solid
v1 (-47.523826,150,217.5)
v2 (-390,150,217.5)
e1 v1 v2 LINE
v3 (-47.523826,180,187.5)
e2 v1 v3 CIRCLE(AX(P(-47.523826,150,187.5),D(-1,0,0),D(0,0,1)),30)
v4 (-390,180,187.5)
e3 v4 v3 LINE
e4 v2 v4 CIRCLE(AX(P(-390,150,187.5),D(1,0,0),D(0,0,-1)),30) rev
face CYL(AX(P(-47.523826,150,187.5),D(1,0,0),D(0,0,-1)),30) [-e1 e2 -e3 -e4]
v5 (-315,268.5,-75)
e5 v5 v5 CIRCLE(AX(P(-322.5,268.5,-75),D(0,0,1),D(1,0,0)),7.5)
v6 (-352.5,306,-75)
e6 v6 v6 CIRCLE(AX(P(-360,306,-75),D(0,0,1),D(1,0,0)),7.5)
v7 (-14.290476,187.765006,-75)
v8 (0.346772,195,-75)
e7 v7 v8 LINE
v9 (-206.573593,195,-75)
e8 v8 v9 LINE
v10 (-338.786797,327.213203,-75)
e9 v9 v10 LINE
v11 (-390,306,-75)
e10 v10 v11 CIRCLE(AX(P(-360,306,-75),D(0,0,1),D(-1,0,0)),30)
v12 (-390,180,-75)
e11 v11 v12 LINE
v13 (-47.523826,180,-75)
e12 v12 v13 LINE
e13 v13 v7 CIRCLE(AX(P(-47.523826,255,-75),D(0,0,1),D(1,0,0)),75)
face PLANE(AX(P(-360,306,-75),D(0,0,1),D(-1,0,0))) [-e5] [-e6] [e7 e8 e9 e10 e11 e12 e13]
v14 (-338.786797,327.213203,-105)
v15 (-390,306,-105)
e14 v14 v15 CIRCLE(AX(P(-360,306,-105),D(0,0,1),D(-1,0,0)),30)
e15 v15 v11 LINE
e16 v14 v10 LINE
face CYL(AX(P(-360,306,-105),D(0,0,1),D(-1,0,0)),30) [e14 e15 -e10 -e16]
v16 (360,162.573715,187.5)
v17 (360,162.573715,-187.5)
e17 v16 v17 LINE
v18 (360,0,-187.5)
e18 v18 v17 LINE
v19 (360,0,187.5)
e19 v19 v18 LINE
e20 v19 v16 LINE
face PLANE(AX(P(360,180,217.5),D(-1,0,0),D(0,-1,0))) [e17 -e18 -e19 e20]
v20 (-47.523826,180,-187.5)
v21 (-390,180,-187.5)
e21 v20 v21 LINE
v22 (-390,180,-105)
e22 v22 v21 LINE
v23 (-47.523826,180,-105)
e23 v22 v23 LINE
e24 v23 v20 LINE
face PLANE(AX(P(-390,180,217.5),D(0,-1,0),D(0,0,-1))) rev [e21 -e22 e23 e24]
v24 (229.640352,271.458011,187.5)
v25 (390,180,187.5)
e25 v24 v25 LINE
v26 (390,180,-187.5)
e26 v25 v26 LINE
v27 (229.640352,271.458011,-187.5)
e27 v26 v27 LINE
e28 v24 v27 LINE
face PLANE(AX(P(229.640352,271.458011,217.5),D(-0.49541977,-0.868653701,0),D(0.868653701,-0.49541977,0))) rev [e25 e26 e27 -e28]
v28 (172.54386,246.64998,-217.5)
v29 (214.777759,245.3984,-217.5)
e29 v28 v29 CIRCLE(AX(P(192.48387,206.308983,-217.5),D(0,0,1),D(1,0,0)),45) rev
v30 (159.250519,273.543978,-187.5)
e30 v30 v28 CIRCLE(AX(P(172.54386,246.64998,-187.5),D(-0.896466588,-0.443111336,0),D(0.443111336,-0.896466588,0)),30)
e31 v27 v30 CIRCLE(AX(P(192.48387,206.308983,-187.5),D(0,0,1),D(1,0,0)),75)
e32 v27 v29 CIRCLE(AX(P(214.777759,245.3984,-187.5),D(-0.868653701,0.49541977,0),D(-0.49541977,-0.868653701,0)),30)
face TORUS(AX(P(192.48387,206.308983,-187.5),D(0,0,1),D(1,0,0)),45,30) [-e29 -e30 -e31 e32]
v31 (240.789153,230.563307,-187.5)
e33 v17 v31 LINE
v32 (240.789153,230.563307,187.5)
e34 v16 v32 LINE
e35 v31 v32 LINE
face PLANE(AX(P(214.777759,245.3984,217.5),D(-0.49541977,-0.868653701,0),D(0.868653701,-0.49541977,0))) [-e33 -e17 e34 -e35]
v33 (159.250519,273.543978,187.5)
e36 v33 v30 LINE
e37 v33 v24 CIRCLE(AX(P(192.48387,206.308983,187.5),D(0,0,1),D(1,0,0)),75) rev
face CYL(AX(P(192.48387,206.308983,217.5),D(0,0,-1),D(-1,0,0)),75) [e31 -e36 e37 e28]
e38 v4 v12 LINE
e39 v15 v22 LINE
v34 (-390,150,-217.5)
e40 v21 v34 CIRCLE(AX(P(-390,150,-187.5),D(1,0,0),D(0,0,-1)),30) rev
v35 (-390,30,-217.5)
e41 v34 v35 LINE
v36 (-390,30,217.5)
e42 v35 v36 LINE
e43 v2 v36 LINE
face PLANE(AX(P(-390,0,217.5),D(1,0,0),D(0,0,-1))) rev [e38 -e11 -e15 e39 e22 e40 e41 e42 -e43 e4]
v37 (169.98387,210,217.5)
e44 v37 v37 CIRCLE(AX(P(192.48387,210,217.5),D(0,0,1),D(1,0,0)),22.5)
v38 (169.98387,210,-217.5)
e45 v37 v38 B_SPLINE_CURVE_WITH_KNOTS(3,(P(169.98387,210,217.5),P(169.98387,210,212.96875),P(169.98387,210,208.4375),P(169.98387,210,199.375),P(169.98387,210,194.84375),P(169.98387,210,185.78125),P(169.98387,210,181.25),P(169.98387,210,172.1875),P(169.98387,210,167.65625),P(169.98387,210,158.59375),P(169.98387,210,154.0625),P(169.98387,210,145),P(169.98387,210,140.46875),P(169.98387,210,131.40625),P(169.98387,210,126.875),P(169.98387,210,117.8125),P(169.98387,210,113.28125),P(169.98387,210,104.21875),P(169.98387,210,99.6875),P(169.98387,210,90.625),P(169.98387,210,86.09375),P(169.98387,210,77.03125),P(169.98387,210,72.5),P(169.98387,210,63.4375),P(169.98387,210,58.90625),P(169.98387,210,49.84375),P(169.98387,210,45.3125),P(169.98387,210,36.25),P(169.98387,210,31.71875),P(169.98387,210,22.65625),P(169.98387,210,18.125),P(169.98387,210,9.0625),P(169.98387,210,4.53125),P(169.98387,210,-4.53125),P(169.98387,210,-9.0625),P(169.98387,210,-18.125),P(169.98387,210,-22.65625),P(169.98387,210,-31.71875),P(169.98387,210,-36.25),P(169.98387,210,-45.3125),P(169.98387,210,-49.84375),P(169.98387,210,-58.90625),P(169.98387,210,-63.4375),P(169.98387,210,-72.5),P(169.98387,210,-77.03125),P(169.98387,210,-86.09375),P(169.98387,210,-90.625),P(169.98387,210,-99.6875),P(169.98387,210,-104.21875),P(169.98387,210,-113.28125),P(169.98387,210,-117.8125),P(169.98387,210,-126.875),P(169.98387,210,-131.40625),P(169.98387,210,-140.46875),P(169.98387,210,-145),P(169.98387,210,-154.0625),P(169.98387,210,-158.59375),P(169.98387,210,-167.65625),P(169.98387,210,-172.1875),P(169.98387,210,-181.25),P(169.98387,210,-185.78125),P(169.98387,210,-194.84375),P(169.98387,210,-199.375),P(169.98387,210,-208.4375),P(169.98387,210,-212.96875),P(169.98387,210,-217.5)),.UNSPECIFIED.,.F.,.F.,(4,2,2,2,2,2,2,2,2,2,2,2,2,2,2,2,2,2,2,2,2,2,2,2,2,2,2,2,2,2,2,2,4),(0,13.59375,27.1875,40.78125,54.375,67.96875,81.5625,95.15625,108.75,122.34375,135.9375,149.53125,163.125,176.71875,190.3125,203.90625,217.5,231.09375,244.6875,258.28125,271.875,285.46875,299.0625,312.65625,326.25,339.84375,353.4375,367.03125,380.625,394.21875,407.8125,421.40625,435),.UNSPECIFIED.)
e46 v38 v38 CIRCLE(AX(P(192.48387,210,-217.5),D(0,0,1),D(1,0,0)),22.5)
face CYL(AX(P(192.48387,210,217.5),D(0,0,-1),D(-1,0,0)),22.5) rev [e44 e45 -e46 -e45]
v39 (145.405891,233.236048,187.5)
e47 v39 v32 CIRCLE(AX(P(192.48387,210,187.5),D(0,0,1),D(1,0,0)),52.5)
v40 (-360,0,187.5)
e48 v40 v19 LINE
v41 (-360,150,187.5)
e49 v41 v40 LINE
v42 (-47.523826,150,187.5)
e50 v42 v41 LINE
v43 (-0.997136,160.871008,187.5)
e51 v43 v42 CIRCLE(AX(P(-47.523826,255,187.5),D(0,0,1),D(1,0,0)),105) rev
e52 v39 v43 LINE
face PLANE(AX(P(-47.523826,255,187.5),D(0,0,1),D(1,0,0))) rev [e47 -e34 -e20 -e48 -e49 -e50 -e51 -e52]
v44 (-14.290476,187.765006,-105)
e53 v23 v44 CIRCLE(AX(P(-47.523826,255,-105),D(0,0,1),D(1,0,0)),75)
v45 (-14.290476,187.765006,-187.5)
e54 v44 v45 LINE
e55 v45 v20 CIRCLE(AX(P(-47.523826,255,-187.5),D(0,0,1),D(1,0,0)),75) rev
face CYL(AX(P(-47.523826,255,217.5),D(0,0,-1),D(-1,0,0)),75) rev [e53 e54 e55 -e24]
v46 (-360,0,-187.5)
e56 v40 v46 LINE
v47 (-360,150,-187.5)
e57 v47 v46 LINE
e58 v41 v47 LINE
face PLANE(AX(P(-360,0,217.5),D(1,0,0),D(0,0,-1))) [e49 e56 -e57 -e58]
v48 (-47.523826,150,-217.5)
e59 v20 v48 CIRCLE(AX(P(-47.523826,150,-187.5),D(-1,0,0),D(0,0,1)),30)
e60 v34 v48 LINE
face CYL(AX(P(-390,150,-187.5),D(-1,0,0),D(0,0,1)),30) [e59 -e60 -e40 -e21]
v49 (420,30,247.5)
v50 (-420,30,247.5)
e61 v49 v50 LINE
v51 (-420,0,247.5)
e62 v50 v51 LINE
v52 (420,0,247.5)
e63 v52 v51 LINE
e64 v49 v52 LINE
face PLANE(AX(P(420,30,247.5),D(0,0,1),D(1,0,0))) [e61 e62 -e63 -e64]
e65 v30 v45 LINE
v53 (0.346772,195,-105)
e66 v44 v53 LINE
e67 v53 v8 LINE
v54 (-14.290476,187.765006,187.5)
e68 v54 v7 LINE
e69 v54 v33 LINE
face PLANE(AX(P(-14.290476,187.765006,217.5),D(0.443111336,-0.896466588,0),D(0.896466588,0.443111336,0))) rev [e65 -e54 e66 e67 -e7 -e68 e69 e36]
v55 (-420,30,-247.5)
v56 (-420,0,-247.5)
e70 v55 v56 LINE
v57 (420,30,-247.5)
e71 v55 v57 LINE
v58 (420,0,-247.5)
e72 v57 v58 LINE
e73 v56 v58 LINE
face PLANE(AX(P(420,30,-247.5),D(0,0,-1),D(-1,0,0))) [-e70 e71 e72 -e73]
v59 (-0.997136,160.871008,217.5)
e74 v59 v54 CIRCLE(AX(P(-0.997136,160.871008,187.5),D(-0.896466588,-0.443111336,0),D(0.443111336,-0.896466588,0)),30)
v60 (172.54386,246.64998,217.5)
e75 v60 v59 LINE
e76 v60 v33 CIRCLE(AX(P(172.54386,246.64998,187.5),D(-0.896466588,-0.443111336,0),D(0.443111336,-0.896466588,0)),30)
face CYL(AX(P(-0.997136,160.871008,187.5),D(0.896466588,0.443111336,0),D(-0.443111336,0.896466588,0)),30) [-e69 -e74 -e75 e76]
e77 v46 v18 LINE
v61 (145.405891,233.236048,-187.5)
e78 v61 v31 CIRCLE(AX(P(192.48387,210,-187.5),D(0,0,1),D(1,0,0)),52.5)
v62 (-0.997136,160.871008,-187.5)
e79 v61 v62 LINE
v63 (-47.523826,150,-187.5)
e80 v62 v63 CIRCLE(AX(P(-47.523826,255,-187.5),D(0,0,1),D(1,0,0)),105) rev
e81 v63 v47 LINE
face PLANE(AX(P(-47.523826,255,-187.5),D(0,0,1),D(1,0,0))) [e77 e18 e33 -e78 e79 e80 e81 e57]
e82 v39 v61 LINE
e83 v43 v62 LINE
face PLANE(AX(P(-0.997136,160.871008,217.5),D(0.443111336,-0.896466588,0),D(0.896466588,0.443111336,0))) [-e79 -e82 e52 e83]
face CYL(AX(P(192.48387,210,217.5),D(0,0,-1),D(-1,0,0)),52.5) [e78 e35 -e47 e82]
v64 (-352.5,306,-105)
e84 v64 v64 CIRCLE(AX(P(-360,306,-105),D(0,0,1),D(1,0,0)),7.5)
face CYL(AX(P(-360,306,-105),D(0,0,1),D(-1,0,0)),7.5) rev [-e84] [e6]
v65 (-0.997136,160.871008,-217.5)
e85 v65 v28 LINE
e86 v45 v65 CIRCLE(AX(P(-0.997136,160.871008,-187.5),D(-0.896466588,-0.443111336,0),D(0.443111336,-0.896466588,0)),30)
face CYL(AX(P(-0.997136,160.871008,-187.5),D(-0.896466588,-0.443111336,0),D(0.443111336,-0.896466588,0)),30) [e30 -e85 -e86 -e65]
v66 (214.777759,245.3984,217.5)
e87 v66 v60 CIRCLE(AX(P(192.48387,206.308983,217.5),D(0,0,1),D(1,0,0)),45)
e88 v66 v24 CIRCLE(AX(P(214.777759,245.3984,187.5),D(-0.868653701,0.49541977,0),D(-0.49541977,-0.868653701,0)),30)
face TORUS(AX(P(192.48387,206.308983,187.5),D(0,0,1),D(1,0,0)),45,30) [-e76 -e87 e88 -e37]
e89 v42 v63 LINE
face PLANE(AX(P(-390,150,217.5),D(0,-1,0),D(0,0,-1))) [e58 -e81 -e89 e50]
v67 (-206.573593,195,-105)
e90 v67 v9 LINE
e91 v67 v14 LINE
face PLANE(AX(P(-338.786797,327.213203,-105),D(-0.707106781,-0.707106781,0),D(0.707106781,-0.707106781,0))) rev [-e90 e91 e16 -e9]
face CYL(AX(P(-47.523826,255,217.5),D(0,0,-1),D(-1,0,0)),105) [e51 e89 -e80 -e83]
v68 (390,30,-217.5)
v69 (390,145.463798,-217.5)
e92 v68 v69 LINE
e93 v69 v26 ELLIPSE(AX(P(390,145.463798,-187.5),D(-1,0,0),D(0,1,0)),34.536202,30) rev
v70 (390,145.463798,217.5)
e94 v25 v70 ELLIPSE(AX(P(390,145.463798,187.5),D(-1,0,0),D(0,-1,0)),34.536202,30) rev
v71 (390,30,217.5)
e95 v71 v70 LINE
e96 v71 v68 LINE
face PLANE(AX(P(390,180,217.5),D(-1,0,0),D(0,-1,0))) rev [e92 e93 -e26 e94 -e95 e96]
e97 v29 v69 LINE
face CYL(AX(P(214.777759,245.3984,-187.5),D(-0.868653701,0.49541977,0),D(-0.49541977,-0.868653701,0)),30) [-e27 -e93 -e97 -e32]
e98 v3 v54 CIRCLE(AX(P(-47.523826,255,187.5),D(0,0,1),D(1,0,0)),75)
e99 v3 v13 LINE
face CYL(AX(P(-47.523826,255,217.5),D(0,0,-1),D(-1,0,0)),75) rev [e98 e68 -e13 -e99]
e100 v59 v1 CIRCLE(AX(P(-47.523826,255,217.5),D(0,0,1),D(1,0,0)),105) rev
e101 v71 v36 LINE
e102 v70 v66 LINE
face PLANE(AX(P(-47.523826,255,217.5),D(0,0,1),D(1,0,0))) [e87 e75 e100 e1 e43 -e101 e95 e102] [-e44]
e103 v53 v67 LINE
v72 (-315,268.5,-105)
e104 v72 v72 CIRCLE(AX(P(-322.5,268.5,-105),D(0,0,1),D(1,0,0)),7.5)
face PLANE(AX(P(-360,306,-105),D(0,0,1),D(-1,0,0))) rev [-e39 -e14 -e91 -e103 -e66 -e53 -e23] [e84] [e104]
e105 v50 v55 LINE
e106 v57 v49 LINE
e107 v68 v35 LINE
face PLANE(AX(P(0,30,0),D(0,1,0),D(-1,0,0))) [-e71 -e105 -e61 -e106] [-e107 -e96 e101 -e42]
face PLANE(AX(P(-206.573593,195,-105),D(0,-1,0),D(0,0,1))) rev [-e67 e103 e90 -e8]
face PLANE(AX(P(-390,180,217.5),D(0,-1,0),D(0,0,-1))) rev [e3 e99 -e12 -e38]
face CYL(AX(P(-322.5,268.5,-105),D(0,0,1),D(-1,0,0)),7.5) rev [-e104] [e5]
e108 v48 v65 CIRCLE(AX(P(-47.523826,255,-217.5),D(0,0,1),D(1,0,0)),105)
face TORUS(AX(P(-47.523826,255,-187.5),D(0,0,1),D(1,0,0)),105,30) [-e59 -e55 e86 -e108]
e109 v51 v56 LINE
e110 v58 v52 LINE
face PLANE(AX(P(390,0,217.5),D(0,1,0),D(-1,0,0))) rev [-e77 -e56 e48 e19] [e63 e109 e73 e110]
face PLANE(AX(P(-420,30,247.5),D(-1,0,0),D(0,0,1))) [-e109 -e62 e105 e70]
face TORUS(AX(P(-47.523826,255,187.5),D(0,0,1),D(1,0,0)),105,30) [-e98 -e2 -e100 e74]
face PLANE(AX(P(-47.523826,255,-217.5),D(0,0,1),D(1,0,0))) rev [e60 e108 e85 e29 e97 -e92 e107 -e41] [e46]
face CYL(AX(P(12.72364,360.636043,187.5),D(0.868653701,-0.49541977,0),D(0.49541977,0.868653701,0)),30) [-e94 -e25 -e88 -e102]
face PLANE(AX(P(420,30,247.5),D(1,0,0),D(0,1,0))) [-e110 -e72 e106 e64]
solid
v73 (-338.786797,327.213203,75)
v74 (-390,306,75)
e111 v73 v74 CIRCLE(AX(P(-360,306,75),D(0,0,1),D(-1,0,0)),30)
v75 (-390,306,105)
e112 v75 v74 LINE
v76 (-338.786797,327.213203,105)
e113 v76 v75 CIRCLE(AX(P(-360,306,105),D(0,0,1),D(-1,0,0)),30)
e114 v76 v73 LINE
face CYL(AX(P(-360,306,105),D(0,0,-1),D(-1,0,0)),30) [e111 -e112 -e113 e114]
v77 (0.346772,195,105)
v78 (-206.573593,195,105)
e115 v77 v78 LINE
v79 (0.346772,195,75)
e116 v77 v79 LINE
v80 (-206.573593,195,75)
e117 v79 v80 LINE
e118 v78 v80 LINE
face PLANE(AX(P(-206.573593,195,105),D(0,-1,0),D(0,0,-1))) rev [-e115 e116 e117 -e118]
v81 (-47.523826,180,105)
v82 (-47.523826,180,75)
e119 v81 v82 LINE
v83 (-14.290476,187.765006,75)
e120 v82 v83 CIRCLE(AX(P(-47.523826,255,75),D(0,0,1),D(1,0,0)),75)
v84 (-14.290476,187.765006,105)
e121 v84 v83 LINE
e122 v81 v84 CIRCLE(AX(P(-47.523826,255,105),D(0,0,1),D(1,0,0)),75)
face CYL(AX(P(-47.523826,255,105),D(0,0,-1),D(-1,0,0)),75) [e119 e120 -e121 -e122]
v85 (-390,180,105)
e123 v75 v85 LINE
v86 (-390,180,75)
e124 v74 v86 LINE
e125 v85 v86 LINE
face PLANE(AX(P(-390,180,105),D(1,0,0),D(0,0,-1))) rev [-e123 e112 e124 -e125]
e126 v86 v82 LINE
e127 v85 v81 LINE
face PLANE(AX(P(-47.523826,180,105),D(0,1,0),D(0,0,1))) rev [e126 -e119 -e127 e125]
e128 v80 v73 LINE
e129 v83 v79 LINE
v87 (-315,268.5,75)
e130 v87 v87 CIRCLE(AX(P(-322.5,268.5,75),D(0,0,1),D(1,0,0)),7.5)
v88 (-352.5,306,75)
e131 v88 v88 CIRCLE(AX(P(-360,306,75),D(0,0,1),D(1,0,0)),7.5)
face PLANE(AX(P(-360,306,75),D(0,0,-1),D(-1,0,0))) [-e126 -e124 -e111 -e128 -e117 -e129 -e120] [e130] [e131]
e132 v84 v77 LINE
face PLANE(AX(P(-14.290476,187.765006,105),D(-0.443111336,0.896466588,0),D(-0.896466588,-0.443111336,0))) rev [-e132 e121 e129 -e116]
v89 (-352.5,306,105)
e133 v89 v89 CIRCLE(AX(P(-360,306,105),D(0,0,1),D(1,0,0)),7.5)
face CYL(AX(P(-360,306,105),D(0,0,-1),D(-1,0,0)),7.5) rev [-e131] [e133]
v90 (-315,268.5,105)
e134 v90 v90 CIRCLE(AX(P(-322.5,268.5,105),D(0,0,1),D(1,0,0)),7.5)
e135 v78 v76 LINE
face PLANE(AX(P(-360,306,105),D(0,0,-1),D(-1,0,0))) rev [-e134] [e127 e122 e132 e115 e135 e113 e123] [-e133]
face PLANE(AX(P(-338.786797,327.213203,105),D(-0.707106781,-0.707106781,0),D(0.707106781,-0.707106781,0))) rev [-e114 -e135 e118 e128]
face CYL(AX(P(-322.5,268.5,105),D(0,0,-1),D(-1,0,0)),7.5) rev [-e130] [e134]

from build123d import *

# Parameters (mm, degrees)
SKETCH1_R           = 22.5
BOSS_EXTRUDE1_DEPTH = 217.5
BOSS_EXTRUDE2_START = -142.5
SKETCH2_R           = 7.5
BOSS_EXTRUDE2_DEPTH = 30
SHELL1_START        = -187.5
SHELL1_DEPTH        = 375
SKETCH3_W           = 840
SKETCH3_H           = 495
SKETCH3_W_2         = 720
SKETCH3_H_2         = 375
BOSS_EXTRUDE3_DEPTH = 30
FILLET1_R           = 30


# Read off the part's stored shape, not the designer's step: Shell1
with BuildPart() as part:
    # Sketch1 → Boss-Extrude1 (new, symmetric)
    with BuildSketch(Plane.XY):
        with BuildLine():
            Line((390, 0), (-390, 0))
            Line((-390, 0), (-390, 180))
            Line((-390, 180), (-47.523825825, 180))
            ThreePointArc((-47.523825825, 180), (-30.459602431, 181.967046616), (-14.290475646, 187.765005868))
            Line((-14.290475646, 187.765005868), (159.250519483, 273.543977608))
            ThreePointArc((159.250519483, 273.543977608), (194.705480887, 281.276072546), (229.640352409, 271.45801102))
            Line((229.640352409, 271.45801102), (390, 180))
            Line((390, 180), (390, 0))
        make_face()
        with Locations(Location((192.483869662, 210, 0), (0, 0, 180))):
            Circle(SKETCH1_R, mode=Mode.SUBTRACT)
    extrude(amount=BOSS_EXTRUDE1_DEPTH, both=True)


with BuildPart() as body_2:
    # Sketch2 → Boss-Extrude2 (new body)
    with BuildSketch(Plane.XY.offset(217.5).offset(BOSS_EXTRUDE2_START)):
        with BuildLine():
            Line((-390, 180), (-390, 306))
            ThreePointArc((-390, 306), (-371.480502971, 333.716385975), (-338.786796564, 327.213203436))
            Line((-338.786796564, 327.213203436), (-206.573593129, 195))
            Line((-206.573593129, 195), (0.34677234, 195))
            Line((0.34677234, 195), (-14.290475646, 187.765005868))
            ThreePointArc((-14.290475646, 187.765005868), (-30.459602431, 181.967046616), (-47.523825825, 180))
            Line((-47.523825825, 180), (-390, 180))
        make_face()
        with Locations((-360, 306)):
            Circle(SKETCH2_R, mode=Mode.SUBTRACT)
        with Locations((-322.5, 268.5)):
            Circle(SKETCH2_R, mode=Mode.SUBTRACT)
    boss_extrude2 = extrude(amount=BOSS_EXTRUDE2_DEPTH)


with BuildPart() as part_1:
    add(part.part)

    # Mirror7: Boss-Extrude2 across plane
    add(boss_extrude2.mirror(Plane.XY))

    # Shell1 outline → Shell1 (cut)
    with BuildSketch(Plane.XY.offset(SHELL1_START)):
        with BuildLine():
            Line((145.405891256, 233.236048487), (-0.997135575, 160.871008216))
            ThreePointArc((-0.997135575, 160.871008216), (-23.633913073, 152.753865263), (-47.523825825, 150))
            Line((-47.523825825, 150), (-360, 150))
            Line((-360, 150), (-360, 0))
            Line((-360, 0), (360, 0))
            Line((360, 0), (360, 162.573715059))
            Line((360, 162.573715059), (240.789153251, 230.563306577))
            ThreePointArc((240.789153251, 230.563306577), (191.013340222, 157.520598868), (145.405891256, 233.236048487))
        make_face()
    extrude(amount=SHELL1_DEPTH, mode=Mode.SUBTRACT)

    # Sketch3 → Boss-Extrude3 (add)
    with BuildSketch(Plane.XZ):
        Rectangle(SKETCH3_W, SKETCH3_H)
        Rectangle(SKETCH3_W_2, SKETCH3_H_2, mode=Mode.SUBTRACT)
    extrude(amount=-BOSS_EXTRUDE3_DEPTH)

    # Fillet1
    fillet1_edges = [part_1.edges().sort_by_distance(p)[0] for p in [
        (-218.761912913, 180, -217.5),
        (-30.459602431, 181.967046616, -217.5),
        (309.820176204, 225.72900551, 217.5),
        (194.705480887, 281.276072546, 217.5),
        (72.480021918, 230.654491738, 217.5),
        (-30.459602431, 181.967046616, 217.5),
        (-218.761912913, 180, 217.5),
        (72.480021918, 230.654491738, -217.5),
        (194.705480887, 281.276072546, -217.5),
        (309.820176204, 225.72900551, -217.5),
    ]]
    fillet(fillet1_edges, radius=FILLET1_R)


solid = Compound([body_2.part, part_1.part])
